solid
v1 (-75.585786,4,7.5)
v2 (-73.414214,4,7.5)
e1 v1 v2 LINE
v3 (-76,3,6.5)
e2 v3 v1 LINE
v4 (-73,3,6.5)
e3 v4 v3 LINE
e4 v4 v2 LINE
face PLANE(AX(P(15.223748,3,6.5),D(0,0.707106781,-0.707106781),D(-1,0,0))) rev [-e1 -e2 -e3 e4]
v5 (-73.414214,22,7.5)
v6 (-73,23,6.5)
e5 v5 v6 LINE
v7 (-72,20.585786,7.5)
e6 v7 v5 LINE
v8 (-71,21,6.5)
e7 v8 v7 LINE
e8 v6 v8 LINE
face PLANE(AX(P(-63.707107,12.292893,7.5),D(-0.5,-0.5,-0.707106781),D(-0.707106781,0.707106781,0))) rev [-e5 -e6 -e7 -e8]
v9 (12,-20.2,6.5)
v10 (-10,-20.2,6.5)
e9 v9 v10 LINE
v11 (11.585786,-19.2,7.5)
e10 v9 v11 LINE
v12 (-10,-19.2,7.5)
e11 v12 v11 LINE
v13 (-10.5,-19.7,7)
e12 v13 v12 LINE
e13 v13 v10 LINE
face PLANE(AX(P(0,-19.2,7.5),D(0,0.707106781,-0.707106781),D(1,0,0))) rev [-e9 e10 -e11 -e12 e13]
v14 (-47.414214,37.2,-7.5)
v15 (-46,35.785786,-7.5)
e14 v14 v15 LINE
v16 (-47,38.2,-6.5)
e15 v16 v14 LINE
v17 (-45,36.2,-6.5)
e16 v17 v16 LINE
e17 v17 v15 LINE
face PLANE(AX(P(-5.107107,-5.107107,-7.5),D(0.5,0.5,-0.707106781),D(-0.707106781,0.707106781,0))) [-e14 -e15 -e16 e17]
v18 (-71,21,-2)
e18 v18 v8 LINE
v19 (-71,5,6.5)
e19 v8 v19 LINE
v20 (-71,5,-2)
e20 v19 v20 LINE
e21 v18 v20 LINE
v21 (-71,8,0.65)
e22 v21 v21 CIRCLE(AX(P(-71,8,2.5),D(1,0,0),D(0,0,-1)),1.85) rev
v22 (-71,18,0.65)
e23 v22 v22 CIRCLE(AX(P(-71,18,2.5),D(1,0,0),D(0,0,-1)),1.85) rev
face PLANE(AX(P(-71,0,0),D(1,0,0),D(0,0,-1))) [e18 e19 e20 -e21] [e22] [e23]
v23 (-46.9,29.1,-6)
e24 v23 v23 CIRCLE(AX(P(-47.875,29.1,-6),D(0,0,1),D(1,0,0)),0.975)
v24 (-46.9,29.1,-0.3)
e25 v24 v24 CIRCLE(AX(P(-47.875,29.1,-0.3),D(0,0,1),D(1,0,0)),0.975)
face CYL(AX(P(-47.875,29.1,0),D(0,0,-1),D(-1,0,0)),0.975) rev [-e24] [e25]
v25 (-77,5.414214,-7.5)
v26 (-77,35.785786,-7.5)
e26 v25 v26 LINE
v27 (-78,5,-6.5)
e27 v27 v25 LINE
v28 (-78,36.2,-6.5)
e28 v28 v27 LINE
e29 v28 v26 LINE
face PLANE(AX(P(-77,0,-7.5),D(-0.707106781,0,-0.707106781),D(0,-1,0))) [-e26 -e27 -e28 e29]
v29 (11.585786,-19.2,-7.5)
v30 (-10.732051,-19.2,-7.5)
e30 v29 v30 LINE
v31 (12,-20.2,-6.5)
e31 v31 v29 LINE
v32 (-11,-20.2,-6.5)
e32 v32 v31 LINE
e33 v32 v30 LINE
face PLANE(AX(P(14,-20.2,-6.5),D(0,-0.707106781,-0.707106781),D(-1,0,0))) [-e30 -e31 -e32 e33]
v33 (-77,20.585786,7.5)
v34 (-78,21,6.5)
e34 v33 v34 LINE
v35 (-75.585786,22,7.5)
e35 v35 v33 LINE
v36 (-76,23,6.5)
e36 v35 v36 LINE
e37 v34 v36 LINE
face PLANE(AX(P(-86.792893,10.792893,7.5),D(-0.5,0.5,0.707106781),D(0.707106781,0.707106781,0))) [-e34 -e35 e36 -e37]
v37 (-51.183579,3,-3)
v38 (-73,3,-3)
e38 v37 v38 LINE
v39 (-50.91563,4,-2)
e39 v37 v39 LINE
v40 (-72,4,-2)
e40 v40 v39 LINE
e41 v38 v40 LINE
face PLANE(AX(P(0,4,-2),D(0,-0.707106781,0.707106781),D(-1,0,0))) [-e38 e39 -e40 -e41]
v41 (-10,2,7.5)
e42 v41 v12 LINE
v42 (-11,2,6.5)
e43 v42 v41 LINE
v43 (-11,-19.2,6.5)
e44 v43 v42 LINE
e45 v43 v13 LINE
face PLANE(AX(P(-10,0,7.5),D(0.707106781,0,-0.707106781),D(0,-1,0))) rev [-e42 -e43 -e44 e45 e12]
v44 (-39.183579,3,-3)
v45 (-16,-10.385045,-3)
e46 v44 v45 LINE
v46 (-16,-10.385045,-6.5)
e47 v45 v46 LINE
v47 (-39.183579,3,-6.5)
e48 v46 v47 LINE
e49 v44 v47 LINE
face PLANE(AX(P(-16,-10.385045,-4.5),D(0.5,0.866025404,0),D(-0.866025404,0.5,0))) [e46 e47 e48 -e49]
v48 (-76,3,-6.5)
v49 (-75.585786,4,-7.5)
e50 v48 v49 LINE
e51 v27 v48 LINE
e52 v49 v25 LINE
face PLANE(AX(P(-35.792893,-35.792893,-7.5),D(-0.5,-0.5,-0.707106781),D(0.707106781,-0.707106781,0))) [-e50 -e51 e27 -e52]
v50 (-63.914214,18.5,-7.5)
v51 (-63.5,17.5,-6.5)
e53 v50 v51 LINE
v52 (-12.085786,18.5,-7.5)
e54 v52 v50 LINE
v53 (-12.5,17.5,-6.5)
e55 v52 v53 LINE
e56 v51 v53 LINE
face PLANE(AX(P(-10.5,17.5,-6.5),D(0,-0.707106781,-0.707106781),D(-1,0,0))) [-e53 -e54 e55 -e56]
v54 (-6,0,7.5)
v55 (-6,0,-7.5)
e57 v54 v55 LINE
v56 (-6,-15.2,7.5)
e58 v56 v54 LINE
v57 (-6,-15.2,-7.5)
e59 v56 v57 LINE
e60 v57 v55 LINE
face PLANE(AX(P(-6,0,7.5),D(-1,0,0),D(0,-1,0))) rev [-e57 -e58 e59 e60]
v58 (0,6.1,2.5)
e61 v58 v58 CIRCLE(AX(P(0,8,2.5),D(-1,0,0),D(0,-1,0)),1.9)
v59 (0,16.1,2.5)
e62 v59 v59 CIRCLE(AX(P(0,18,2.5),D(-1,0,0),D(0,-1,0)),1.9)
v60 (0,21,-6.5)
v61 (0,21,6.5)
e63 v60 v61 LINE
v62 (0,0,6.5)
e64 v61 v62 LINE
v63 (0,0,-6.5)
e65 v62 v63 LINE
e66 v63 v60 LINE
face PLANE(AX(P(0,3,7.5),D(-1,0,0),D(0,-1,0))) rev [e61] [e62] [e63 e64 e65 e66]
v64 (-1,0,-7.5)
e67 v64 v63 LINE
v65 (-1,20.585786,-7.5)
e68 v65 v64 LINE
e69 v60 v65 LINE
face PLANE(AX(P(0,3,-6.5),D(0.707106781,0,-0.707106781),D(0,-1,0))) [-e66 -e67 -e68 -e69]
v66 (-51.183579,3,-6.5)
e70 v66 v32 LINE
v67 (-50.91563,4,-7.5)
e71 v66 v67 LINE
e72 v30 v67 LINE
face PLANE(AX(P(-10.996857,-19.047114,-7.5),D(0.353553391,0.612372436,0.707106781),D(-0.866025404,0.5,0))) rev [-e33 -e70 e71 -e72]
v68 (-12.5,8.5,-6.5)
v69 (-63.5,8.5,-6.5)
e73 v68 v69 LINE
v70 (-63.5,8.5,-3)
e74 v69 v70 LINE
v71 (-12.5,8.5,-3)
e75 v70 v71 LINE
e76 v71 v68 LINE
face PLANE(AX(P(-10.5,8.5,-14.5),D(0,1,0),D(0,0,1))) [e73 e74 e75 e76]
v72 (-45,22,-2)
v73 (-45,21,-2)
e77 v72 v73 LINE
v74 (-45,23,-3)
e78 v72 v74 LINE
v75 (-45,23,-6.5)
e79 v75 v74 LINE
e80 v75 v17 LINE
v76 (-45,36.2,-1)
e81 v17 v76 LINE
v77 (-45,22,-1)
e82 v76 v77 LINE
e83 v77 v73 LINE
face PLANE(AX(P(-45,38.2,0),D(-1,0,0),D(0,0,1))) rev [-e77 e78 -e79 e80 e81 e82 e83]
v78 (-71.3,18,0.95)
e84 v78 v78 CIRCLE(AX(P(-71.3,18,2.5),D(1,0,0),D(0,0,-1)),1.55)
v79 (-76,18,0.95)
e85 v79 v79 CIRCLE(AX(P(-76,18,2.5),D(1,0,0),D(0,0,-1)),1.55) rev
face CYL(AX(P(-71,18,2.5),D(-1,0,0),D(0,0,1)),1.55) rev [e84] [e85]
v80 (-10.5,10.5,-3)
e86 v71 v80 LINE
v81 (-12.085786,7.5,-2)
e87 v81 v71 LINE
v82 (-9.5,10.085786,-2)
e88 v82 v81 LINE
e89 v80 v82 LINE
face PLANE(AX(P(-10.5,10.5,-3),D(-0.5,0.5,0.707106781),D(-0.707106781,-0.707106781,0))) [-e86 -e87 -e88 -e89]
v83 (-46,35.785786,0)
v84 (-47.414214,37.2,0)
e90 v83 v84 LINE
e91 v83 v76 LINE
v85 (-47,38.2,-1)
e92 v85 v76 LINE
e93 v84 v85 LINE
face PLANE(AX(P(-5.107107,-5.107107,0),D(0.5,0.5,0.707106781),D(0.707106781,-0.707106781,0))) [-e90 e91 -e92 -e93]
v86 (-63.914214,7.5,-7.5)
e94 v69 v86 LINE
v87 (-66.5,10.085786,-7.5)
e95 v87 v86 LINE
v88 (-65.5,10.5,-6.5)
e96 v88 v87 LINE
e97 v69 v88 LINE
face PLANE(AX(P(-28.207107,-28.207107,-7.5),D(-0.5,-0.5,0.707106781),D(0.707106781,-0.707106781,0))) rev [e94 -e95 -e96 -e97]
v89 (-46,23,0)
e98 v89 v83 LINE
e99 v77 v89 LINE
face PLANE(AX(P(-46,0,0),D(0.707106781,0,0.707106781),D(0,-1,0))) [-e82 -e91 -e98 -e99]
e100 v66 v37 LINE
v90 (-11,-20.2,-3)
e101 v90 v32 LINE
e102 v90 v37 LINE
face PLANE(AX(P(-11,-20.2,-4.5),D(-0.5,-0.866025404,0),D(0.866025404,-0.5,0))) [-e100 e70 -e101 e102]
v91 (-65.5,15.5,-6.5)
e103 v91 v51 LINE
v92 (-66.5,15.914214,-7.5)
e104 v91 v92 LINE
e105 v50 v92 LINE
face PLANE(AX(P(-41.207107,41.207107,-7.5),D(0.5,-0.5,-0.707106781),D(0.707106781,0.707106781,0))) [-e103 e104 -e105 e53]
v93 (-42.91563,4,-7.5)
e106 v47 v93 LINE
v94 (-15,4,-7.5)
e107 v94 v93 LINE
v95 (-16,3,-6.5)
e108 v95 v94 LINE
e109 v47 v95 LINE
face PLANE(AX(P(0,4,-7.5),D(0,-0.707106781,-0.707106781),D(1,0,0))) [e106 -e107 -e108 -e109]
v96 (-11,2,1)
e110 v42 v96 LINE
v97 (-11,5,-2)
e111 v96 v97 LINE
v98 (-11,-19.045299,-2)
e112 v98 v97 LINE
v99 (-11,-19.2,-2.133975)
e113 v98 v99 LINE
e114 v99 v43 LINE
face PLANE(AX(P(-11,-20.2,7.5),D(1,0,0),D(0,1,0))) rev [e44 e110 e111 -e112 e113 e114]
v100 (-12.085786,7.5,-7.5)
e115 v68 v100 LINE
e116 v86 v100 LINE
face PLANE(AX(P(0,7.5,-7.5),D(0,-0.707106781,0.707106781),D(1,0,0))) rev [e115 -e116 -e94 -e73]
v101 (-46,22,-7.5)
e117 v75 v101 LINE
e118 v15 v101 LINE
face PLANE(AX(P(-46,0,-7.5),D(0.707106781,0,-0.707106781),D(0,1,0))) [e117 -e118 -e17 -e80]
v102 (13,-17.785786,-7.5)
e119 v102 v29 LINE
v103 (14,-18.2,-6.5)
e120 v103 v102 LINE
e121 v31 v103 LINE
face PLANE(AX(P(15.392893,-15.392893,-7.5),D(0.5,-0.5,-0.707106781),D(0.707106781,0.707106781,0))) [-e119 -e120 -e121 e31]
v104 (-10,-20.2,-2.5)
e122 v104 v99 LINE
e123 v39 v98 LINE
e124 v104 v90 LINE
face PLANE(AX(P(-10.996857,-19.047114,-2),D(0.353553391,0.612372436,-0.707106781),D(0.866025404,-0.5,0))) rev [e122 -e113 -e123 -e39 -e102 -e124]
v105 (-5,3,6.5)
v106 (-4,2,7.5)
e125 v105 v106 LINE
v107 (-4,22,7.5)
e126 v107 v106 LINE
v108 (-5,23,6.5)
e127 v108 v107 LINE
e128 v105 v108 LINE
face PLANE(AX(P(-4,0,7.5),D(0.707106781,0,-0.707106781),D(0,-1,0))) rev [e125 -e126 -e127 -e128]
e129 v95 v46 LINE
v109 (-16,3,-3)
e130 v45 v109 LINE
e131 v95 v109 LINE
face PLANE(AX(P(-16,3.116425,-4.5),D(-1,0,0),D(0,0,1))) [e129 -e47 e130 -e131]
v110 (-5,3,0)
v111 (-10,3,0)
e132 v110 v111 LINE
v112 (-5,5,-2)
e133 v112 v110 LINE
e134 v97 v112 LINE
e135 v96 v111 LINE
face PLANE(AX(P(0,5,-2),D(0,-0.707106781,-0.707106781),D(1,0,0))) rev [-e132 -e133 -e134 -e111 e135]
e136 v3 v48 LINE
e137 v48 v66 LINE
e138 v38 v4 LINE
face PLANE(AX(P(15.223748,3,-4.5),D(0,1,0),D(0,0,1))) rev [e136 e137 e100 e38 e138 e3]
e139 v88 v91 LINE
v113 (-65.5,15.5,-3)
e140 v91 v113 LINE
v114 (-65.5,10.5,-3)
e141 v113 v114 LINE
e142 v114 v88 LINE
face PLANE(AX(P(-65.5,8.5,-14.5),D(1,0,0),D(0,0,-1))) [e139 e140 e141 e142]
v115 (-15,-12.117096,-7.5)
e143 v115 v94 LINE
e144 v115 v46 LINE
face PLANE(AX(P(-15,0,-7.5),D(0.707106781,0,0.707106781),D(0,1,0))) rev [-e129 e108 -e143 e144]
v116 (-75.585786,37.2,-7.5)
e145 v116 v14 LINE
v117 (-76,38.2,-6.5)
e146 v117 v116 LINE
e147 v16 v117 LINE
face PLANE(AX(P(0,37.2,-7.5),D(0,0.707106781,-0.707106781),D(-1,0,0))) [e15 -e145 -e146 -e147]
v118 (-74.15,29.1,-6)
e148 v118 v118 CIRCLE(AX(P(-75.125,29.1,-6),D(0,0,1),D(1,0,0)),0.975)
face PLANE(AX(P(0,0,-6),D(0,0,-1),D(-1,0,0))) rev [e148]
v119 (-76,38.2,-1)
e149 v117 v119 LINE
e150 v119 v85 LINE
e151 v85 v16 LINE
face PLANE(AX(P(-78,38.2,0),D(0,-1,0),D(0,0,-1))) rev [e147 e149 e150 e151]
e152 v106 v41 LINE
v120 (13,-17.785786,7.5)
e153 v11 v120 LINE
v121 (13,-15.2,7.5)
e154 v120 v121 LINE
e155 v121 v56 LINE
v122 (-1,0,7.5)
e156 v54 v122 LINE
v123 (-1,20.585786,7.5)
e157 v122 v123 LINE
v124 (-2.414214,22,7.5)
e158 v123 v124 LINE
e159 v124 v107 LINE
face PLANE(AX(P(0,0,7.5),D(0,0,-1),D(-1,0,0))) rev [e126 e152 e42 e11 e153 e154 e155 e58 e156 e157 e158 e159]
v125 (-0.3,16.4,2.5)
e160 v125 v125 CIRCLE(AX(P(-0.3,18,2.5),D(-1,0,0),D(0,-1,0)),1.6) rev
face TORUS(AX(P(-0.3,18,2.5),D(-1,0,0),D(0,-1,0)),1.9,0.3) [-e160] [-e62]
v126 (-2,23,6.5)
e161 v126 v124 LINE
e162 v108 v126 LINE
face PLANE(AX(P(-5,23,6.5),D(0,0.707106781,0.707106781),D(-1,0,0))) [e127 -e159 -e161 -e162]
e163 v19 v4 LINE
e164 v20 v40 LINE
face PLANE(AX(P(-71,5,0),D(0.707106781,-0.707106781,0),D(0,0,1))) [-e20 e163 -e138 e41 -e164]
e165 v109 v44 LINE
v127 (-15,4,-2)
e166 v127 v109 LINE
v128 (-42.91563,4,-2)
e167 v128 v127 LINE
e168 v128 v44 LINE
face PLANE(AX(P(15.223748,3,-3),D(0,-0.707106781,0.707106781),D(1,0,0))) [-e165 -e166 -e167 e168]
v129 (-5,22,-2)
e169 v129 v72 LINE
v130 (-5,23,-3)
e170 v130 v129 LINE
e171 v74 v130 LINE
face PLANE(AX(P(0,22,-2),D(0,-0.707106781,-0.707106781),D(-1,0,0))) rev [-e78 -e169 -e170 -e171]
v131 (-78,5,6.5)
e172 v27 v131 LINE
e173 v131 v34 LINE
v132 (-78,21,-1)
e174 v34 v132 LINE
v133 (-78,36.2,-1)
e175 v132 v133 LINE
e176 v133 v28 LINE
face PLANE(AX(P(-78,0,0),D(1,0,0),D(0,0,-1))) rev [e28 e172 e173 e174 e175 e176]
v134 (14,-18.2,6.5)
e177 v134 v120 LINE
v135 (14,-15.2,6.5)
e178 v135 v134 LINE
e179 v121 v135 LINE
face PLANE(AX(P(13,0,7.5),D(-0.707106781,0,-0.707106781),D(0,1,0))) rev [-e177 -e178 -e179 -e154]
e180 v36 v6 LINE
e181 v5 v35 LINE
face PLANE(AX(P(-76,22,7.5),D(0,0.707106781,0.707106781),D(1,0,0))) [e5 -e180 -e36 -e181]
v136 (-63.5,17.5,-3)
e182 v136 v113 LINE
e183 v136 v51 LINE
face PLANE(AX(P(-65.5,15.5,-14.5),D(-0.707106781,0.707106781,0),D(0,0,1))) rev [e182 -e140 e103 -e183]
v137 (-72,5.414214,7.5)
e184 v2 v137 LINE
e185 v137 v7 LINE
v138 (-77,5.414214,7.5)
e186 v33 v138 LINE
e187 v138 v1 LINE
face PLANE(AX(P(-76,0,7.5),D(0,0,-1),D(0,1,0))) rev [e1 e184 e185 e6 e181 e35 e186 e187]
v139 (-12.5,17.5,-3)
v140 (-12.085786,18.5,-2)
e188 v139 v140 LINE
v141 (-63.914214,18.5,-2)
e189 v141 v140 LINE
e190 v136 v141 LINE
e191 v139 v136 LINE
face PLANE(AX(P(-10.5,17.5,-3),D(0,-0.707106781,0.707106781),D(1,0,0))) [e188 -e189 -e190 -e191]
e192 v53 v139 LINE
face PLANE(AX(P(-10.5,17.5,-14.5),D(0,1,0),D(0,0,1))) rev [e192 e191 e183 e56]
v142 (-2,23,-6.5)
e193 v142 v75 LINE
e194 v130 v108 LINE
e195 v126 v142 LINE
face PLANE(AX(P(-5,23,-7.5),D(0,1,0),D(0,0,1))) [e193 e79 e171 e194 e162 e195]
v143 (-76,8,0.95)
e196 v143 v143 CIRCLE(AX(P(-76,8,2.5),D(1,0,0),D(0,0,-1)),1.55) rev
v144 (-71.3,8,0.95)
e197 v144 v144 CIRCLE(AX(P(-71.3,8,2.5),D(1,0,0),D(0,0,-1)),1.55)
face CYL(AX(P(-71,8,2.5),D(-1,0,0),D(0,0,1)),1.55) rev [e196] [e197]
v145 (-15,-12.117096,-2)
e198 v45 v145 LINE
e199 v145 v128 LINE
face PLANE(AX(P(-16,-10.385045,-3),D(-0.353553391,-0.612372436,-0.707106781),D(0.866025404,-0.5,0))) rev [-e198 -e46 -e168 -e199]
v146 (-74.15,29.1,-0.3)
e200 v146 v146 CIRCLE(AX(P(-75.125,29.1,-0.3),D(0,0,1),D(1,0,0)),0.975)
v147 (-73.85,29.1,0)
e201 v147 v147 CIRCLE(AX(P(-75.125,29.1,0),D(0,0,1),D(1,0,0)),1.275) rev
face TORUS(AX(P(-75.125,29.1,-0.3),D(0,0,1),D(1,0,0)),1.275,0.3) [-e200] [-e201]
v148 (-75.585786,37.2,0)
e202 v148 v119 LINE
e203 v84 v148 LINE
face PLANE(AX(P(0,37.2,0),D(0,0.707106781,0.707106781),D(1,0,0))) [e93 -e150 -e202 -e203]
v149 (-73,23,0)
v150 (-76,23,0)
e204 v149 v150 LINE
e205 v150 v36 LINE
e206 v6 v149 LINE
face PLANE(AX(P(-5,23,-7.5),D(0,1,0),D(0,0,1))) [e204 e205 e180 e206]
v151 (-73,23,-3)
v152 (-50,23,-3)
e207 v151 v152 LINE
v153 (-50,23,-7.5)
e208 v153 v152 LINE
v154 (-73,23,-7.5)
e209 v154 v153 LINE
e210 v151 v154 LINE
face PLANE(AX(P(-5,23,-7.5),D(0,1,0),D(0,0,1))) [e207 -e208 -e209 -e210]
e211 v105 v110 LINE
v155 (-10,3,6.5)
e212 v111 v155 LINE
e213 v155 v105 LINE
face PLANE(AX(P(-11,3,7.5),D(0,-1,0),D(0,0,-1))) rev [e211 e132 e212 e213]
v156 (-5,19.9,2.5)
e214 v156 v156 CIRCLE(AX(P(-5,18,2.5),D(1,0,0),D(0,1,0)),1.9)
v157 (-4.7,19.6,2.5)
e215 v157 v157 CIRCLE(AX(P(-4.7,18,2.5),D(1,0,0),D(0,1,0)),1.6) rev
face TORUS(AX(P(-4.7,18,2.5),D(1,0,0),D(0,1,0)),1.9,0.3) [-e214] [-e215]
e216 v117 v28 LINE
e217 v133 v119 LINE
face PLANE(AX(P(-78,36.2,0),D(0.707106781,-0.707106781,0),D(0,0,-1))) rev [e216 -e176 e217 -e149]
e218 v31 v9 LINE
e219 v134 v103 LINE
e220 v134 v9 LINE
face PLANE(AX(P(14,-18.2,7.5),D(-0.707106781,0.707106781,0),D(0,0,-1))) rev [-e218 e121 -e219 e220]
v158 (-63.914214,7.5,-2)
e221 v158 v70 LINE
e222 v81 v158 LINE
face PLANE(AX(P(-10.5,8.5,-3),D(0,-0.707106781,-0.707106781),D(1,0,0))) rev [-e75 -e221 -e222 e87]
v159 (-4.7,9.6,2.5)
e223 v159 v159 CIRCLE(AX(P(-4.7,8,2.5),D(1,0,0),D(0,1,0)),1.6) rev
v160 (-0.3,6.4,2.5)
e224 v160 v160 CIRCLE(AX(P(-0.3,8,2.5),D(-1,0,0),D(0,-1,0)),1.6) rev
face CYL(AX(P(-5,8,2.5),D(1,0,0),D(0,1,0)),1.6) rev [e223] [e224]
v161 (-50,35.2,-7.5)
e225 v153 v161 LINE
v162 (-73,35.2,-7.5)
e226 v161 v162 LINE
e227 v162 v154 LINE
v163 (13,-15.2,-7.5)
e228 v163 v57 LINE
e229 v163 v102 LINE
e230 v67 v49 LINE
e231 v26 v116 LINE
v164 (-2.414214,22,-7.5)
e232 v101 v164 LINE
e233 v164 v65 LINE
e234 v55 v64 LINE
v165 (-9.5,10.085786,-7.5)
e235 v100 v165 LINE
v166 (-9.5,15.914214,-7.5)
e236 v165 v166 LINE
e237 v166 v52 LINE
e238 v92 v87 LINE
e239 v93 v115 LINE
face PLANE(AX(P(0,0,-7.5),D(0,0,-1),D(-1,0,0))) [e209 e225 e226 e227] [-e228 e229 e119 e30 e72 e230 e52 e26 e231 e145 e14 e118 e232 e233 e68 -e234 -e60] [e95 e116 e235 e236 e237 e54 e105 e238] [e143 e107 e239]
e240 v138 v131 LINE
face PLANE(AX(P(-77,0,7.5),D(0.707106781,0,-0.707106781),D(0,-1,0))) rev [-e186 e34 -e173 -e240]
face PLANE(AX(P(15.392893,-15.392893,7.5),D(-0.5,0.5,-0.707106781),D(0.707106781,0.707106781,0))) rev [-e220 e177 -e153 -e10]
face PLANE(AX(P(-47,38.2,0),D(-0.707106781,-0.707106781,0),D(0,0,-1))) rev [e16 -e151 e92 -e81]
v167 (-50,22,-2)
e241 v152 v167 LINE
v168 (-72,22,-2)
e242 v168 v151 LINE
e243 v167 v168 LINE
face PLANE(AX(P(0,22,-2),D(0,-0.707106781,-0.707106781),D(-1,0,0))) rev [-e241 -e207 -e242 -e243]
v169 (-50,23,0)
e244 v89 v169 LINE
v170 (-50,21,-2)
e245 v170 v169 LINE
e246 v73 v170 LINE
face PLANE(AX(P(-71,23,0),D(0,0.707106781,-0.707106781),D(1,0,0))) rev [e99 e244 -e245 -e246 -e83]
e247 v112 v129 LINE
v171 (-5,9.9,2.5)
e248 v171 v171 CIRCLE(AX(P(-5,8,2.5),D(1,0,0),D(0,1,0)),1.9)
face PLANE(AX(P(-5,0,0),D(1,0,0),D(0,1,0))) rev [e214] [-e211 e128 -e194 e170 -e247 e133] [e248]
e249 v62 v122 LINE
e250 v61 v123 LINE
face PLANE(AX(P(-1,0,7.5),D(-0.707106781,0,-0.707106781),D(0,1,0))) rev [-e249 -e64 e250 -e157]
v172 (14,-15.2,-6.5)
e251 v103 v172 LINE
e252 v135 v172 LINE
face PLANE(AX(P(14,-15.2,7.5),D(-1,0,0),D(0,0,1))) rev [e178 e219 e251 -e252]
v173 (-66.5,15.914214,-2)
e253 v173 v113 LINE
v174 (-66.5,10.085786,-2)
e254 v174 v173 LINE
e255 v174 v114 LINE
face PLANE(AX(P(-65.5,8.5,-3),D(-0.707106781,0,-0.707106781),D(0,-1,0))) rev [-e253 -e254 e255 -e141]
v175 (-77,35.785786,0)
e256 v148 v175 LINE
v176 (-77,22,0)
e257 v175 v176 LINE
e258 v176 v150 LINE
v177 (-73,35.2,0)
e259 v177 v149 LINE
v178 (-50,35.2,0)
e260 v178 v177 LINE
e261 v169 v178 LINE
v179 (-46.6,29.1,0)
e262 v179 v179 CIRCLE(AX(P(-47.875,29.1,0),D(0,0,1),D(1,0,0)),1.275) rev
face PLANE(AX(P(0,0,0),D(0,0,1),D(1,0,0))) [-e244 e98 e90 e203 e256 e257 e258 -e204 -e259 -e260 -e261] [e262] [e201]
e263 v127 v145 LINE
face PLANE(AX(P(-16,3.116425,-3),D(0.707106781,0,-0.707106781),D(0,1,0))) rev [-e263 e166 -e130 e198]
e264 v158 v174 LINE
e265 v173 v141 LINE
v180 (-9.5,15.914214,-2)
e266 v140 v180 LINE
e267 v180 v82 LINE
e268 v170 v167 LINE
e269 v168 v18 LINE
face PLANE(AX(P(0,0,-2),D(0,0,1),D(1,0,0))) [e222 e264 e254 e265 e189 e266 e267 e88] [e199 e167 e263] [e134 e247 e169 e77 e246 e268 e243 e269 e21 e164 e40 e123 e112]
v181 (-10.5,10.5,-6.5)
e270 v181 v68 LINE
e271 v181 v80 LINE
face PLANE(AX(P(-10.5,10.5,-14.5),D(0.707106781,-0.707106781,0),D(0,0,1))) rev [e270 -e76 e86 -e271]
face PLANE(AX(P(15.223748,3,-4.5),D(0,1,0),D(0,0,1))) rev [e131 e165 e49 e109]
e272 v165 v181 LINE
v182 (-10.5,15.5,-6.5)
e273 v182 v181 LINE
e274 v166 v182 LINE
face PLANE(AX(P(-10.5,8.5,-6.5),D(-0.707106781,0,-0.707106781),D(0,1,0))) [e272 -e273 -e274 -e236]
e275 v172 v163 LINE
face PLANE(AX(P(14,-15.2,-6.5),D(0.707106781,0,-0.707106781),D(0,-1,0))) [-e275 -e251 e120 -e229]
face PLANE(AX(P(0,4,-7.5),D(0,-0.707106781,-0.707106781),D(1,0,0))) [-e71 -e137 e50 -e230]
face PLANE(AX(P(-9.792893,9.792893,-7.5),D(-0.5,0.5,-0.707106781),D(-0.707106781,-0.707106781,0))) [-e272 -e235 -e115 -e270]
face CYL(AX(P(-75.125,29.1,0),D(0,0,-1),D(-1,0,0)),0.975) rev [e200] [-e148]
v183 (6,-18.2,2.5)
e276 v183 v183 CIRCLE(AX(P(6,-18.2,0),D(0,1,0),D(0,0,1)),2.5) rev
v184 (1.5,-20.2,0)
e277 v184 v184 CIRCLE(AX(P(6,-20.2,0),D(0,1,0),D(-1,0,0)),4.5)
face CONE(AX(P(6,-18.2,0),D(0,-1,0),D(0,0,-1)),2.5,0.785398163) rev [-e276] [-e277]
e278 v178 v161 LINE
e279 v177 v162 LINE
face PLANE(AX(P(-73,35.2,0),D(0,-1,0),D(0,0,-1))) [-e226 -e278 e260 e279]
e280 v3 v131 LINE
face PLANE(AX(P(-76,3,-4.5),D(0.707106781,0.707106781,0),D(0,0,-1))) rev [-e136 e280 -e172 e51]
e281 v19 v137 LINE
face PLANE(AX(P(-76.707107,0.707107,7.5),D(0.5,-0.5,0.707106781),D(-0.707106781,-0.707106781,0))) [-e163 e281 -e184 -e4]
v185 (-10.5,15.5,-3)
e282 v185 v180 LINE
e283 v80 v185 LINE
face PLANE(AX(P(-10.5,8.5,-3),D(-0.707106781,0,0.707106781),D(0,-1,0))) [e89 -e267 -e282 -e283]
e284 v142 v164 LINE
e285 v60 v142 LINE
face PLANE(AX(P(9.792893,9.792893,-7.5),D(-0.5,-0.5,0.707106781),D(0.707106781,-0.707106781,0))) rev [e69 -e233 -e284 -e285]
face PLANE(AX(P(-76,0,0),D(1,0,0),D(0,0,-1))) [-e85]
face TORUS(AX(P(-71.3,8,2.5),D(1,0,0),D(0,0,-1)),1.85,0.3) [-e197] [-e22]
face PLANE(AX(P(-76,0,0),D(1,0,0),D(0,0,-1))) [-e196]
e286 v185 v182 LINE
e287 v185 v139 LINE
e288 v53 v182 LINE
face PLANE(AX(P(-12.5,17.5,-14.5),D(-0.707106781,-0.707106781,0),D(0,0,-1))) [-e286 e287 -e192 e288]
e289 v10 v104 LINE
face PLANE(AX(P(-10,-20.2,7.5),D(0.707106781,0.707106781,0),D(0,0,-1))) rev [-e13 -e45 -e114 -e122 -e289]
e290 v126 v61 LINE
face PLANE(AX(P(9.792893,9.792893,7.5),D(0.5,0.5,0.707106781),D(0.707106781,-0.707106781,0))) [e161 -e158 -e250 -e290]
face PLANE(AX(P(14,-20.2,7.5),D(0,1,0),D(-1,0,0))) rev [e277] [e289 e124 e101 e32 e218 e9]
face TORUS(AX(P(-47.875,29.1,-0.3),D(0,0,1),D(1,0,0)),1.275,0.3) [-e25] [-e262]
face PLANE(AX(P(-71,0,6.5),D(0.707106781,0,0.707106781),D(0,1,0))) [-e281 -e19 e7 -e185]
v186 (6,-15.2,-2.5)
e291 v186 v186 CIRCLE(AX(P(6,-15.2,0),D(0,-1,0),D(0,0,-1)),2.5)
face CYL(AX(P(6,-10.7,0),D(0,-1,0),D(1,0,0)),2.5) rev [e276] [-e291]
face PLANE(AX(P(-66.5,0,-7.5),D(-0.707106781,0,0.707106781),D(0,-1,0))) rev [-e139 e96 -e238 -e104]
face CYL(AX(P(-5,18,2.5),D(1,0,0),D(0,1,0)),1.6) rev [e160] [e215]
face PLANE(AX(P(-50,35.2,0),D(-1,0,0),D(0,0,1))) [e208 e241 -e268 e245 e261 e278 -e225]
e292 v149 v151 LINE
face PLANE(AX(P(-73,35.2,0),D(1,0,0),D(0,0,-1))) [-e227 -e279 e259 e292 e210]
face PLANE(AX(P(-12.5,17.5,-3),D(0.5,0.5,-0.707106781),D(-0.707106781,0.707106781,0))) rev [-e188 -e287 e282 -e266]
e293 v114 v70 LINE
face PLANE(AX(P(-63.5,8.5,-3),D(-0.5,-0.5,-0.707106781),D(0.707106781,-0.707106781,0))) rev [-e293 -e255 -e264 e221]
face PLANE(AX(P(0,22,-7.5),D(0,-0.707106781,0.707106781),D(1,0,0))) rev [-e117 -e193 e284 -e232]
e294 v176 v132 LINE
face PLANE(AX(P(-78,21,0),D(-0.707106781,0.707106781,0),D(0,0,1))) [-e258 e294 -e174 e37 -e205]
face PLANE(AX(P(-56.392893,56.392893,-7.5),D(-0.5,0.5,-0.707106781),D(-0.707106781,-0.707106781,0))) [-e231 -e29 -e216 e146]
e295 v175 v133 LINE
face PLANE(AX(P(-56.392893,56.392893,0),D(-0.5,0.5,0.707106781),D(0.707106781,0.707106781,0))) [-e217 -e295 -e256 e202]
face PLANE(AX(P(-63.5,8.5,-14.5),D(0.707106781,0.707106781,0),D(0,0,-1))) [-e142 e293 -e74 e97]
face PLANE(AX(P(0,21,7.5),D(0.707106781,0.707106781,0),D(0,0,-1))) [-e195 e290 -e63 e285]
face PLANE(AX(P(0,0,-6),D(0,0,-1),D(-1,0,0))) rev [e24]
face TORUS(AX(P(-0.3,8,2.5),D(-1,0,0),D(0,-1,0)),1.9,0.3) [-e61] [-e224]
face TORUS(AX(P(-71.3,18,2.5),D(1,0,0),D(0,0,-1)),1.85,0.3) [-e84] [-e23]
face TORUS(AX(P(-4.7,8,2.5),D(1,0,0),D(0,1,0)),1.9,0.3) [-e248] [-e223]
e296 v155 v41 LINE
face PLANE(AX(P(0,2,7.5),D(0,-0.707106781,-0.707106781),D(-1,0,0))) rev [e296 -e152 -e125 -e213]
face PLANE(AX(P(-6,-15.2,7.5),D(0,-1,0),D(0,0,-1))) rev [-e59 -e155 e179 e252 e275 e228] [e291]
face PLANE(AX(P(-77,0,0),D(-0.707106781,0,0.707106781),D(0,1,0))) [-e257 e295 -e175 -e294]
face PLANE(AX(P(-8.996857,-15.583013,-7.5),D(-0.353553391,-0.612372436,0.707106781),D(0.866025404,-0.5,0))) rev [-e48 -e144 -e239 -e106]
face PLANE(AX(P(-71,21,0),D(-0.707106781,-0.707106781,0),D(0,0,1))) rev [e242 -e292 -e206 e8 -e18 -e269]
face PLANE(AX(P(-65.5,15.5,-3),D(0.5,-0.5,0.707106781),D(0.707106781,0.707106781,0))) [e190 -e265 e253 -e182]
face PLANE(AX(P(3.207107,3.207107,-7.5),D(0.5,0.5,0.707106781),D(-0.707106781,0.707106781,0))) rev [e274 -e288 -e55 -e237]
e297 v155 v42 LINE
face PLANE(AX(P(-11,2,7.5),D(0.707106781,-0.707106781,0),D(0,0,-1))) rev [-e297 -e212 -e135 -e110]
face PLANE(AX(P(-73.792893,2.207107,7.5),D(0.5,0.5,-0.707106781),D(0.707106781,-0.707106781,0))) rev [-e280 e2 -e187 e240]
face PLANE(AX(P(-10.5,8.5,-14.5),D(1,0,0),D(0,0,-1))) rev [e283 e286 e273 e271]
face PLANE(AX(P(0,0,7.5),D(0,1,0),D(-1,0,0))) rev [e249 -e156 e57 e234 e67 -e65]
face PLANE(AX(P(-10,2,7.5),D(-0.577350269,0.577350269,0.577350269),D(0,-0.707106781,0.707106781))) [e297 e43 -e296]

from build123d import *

# Parameters (mm, degrees)
RESSALTO_EXTRUS_O1_DEPTH  = 7.5
ESBO_O2_W                 = 33
ESBO_O2_H                 = 18.2
ESBO_O2_R                 = 0.975
ESBO_O2_W_2               = 23
ESBO_O2_H_2               = 12.2
RESSALTO_EXTRUS_O2_DEPTH  = 3
ESBO_O3_R                 = 0.975
RESSALTO_EXTRUS_O3_DEPTH  = 6
RESSALTO_EXTRUS_O4_DEPTH  = 1.5
ESBO_O6_R                 = 2.5
CORTE_EXTRUS_O1_DEPTH     = 9.5
CHANFRO1_SIZE             = 2
ESBO_O7_W                 = 15
ESBO_O7_H                 = 20
ESBO_O7_R                 = 1.6
RESSALTO_EXTRUS_O5_DEPTH  = 5
ESBO_O9_W                 = 12
ESBO_O9_H                 = 20
RESSALTO_EXTRUS_O6_DEPTH  = 2
ESBO_O10_W                = 12
ESBO_O10_H                = 20
ESBO_O10_R                = 1.55
RESSALTO_EXTRUS_O7_DEPTH  = 5
ESBO_O12_W                = 3
ESBO_O12_H                = 20
RESSALTO_EXTRUS_O11_DEPTH = 73
ESBO_O17_W                = 26
ESBO_O17_H                = 3
CORTE_EXTRUS_O2_DEPTH     = 4.5
ESBO_O18_R                = 0.975
RESSALTO_EXTRUS_O14_DEPTH = 4.5
ESBO_O19_W                = 55
ESBO_O19_H                = 9
CORTE_EXTRUS_O3_DEPTH     = 10
CHANFRO5_SIZE             = 2
RESSALTO_EXTRUS_O15_DEPTH = 3
RESSALTO_EXTRUS_O16_DEPTH = 2.5
CHANFRO8_SIZE             = 2
CHANFRO9_SIZE             = 2
CHANFRO10_SIZE            = 1
CHANFRO11_SIZE            = 1
FILETE1_R                 = 0.3


with BuildPart() as part:
    # Esboço1 → Ressalto-extrusão1 (new, symmetric)
    with BuildSketch(Plane.XY):
        Polygon((0, 0), (-6, 0), (-6, -15.2), (14, -15.2), (14, -20.2), (-11, -20.2), (-11, 3), (0, 3), align=None)
    extrude(amount=RESSALTO_EXTRUS_O1_DEPTH, both=True)

    # Esboço6 → Corte-extrusão1 (cut)
    with BuildSketch(Plane.XZ.offset(20.2)):
        with Locations((6, 0)):
            Circle(ESBO_O6_R)
    extrude(amount=-CORTE_EXTRUS_O1_DEPTH, mode=Mode.SUBTRACT)

    # Chanfro1
    chanfro1_edges = [part.edges().sort_by_distance(p)[0] for p in [
        (3.5, -20.2, 0),
    ]]
    chamfer(chanfro1_edges, length=CHANFRO1_SIZE)

    # Esboço7 → Ressalto-extrusão5 (add)
    with BuildSketch(Plane(origin=(0, 0, 0), x_dir=(0, 0, -1), z_dir=(1, 0, 0))):
        with Locations((0, 13)):
            Rectangle(ESBO_O7_W, ESBO_O7_H)
        with Locations(Location((-2.5, 18, 0), (0, 0, 90))):
            Circle(ESBO_O7_R, mode=Mode.SUBTRACT)
        with Locations(Location((-2.5, 8, 0), (0, 0, 90))):
            Circle(ESBO_O7_R, mode=Mode.SUBTRACT)
    extrude(amount=-RESSALTO_EXTRUS_O5_DEPTH)



with BuildPart() as body_2:
    # Esboço2 → Ressalto-extrusão2 (new body)
    with BuildSketch(Plane.XY.offset(-3)):
        with Locations((-61.5, 29.1)):
            Rectangle(ESBO_O2_W, ESBO_O2_H)
        with Locations((-75.125, 29.1)):
            Circle(ESBO_O2_R, mode=Mode.SUBTRACT)
        with Locations((-47.875, 29.1)):
            Circle(ESBO_O2_R, mode=Mode.SUBTRACT)
        with Locations((-61.5, 29.1)):
            Rectangle(ESBO_O2_W_2, ESBO_O2_H_2, mode=Mode.SUBTRACT)
    extrude(amount=RESSALTO_EXTRUS_O2_DEPTH)

    # Esboço3 → Ressalto-extrusão3 (add)
    # profile 1 of 2: a face of its own
    with BuildSketch(Plane.XY):
        Polygon((-75.125, 31.553738644), (-77.25, 30.326869322), (-77.25, 27.873130678), (-75.125, 26.646261356), (-73, 27.873130678), (-73, 30.326869322), align=None)
        with Locations((-75.125, 29.1)):
            Circle(ESBO_O3_R, mode=Mode.SUBTRACT)
    # profile 2 of 2: a face of its own
    with BuildSketch(Plane.XY):
        Polygon((-47.875, 31.553738644), (-50, 30.326869322), (-50, 27.873130678), (-47.875, 26.646261356), (-45.75, 27.873130678), (-45.75, 30.326869322), align=None)
        with Locations((-47.875, 29.1)):
            Circle(ESBO_O3_R, mode=Mode.SUBTRACT)
    extrude(amount=-RESSALTO_EXTRUS_O3_DEPTH)

    # Esboço4 → Ressalto-extrusão4 (add)
    with BuildSketch(Plane(origin=(0, 0, -6), x_dir=(-1, 0, 0), z_dir=(0, 0, -1))):
        Polygon((47.875, 31.553738644), (45.75, 30.326869322), (45.75, 27.873130678), (47.875, 26.646261356), (50, 27.873130678), (50, 30.326869322), align=None)
        Polygon((75.125, 31.553738644), (73, 30.326869322), (73, 27.873130678), (75.125, 26.646261356), (77.25, 27.873130678), (77.25, 30.326869322), align=None)
    extrude(amount=RESSALTO_EXTRUS_O4_DEPTH)

    # Esboço9 → Ressalto-extrusão6 (add)
    with BuildSketch(Plane(origin=(-78, 0, 0), x_dir=(0, 0, -1), z_dir=(1, 0, 0))):
        with Locations((-1.5, 13)):
            Rectangle(ESBO_O9_W, ESBO_O9_H)
    extrude(amount=RESSALTO_EXTRUS_O6_DEPTH)

    # Esboço10 → Ressalto-extrusão7 (add)
    with BuildSketch(Plane(origin=(-76, 0, 0), x_dir=(0, 0, -1), z_dir=(1, 0, 0))):
        with Locations((-1.5, 13)):
            Rectangle(ESBO_O10_W, ESBO_O10_H)
        with Locations((-2.5, 18)):
            Circle(ESBO_O10_R, mode=Mode.SUBTRACT)
        with Locations((-2.5, 8)):
            Circle(ESBO_O10_R, mode=Mode.SUBTRACT)
    extrude(amount=RESSALTO_EXTRUS_O7_DEPTH)


with BuildPart() as part_1:
    add(part.part)

    add(body_2.part)  # Ressalto-extrusão11 merges body 2
    # Esboço12 → Ressalto-extrusão11 (add)
    with BuildSketch(Plane(origin=(-78, 0, 0), x_dir=(0, 0, -1), z_dir=(1, 0, 0))):
        with Locations((6, 13)):
            Rectangle(ESBO_O12_W, ESBO_O12_H)
    extrude(amount=RESSALTO_EXTRUS_O11_DEPTH)

    # Esboço17 → Corte-extrusão2 (cut)
    with BuildSketch(Plane.XY):
        with Locations((-58, 21.5)):
            Rectangle(ESBO_O17_W, ESBO_O17_H)
    extrude(amount=-CORTE_EXTRUS_O2_DEPTH, mode=Mode.SUBTRACT)

    # Esboço18 → Ressalto-extrusão14 (add)
    with BuildSketch(Plane(origin=(0, 0, -3), x_dir=(-1, 0, 0), z_dir=(0, 0, -1))):
        Polygon((45, 38.2), (45, 23), (50, 23), (50, 30.326869322), (50, 35.2), (73, 35.2), (73, 30.326869322), (73, 23), (78, 23), (78, 38.2), align=None)
        with Locations(Location((75.125, 29.1, 0), (0, 0, 180))):
            Circle(ESBO_O18_R, mode=Mode.SUBTRACT)
        with Locations(Location((47.875, 29.1, 0), (0, 0, 180))):
            Circle(ESBO_O18_R, mode=Mode.SUBTRACT)
    extrude(amount=RESSALTO_EXTRUS_O14_DEPTH)

    # Esboço19 → Corte-extrusão3 (cut)
    with BuildSketch(Plane.XY.offset(-4.5)):
        with Locations((-38, 13)):
            Rectangle(ESBO_O19_W, ESBO_O19_H)
    extrude(amount=-CORTE_EXTRUS_O3_DEPTH, mode=Mode.SUBTRACT)

    # Chanfro5
    chanfro5_edges = [part_1.edges().sort_by_distance(p)[0] for p in [
        (-65.5, 17.5, -6),
        (-10.5, 17.5, -6),
        (-10.5, 8.5, -6),
        (-65.5, 8.5, -6),
    ]]
    chamfer(chanfro5_edges, length=CHANFRO5_SIZE)

    # Esboço20 → Ressalto-extrusão15 (add)
    with BuildSketch(Plane(origin=(0, 0, -7.5), x_dir=(-1, 0, 0), z_dir=(0, 0, -1))):
        Polygon((11, -20.2), (52.872328273, 3.975), (40.368017928, 3.683836287), (16, -10.385045424), (16, 3.116425339), (11, 3), align=None)
    extrude(amount=-RESSALTO_EXTRUS_O15_DEPTH)

    # Esboço21 → Ressalto-extrusão16 (add)
    with BuildSketch(Plane.XY.offset(-4.5)):
        Polygon((-5, 23), (-45, 23), (-50, 23), (-71, 23), (-71, 3), (-51.183578736, 3), (-11, -20.2), (-11, 3), (-5, 3), align=None)
        Polygon((-16, -10.385045424), (-16, 3), (-39.183578736, 3), align=None, mode=Mode.SUBTRACT)
        Polygon((-12.5, 17.5), (-10.5, 15.5), (-10.5, 10.5), (-12.5, 8.5), (-63.5, 8.5), (-65.5, 10.5), (-65.5, 15.5), (-63.5, 17.5), align=None, mode=Mode.SUBTRACT)
    extrude(amount=RESSALTO_EXTRUS_O16_DEPTH)

    # Chanfro8
    chanfro8_edges = [part_1.edges().sort_by_distance(p)[0] for p in [
        (-47.5, 23, -2),
        (-8, 3, -2),
    ]]
    chamfer(chanfro8_edges, length=CHANFRO8_SIZE - 0.0001)  # a hair under: the kernel refuses the full size

    # Chanfro9
    chanfro9_edges = [part_1.edges().sort_by_distance(p)[0] for p in [
        (14, -20.2, 0),
        (-71, 23, 2.75),
        (0, 23, 0),
        (-78, 3, 0),
        (-78, 23, 3.75),
        (-78, 38.2, -3.75),
        (-45, 38.2, -3.75),
        (-71, 3, 2.75),
    ]]
    chamfer(chanfro9_edges, length=CHANFRO9_SIZE - 0.0001)  # a hair under: the kernel refuses the full size

    # Chanfro10
    chanfro10_edges = [part_1.edges().sort_by_distance(p)[0] for p in [
        (0.50005, -20.2, -7.5),
        (0, 10.50005, -7.5),
        (-45, 29.60005, 0),
        (-11, -8.6, 7.5),
        (-11, 3, 3.74995),
        (-23.49995, 23, -7.5),
        (0.50005, -20.2, 7.5),
        (-38, 8.5, -7.5),
        (-65.5, 13, -7.5),
        (-38, 17.5, -7.5),
        (-10.5, 13, -7.5),
        (-64.5, 9.5, -7.5),
        (-64.5, 16.5, -7.5),
        (-11.5, 9.5, -7.5),
        (-11.5, 16.5, -7.5),
        (-27.591789368, 3, -7.5),
        (-63.591839368, 3, -7.5),
        (-31.091789368, -8.6, -7.5),
        (-27.591789368, -3.692522712, -7.5),
        (-16, -3.692522712, -7.5),
        (-25, 23, -2),
        (-61.49995, 23, -2),
        (-62.091739368, 3, -2),
        (-31.091789368, -8.6, -2),
        (-27.591789368, -3.692522712, -2),
        (-16, -3.692522712, -2),
        (-27.591789368, 3, -2),
        (-38, 17.5, -2),
        (-64.5, 16.5, -2),
        (-65.5, 13, -2),
        (-64.5, 9.5, -2),
        (-38, 8.5, -2),
        (-11.5, 9.5, -2),
        (-10.5, 13, -2),
        (-11.5, 16.5, -2),
        (-8, 3, 7.5),
        (-5, 13, 7.5),
        (-3.49995, 23, 7.5),
        (-78, 20.6, -7.5),
        (-78, 13, 7.5),
        (-78, 28.6001, 0),
        (-61.5, 38.2, -7.5),
        (-45, 29.60005, -7.5),
        (14, -16.70005, -7.5),
        (-0.99995, 22.00005, -7.5),
        (13.00005, -19.20005, -7.5),
        (-77.00005, 3.99995, -7.5),
        (-45.99995, 37.20005, -7.5),
        (-77.00005, 37.20005, -7.5),
        (-61.5, 38.2, 0),
        (-45.99995, 37.20005, 0),
        (-77.00005, 37.20005, 0),
        (-71, 13, 7.5),
        (-74.5, 3, 7.5),
        (-74.5, 23, 7.5),
        (-77.00005, 22.00005, 7.5),
        (-71.99995, 22.00005, 7.5),
        (-77.00005, 3.99995, 7.5),
        (-71.99995, 3.99995, 7.5),
        (14, -16.70005, 7.5),
        (-0.99995, 22.00005, 7.5),
        (13.00005, -19.20005, 7.5),
        (0, 10.50005, 7.5),
    ]]
    chamfer(chanfro10_edges, length=CHANFRO10_SIZE)

    # Chanfro11
    chanfro11_edges = [part_1.edges().sort_by_distance(p)[0] for p in [
        (-11, -20.2, 1.75),
    ]]
    chamfer(chanfro11_edges, length=CHANFRO11_SIZE)

    # Filete1
    filete1_edges = [part_1.edges().sort_by_distance(p)[0] for p in [
        (-5, 16.4, 2.5),
        (-5, 6.4, 2.5),
        (0, 6.4, 2.5),
        (0, 16.4, 2.5),
        (-76.1, 29.1, 0),
        (-48.85, 29.1, 0),
        (-71, 18, 4.05),
        (-71, 8, 4.05),
    ]]
    fillet(filete1_edges, radius=FILETE1_R)


solid = part_1.part
